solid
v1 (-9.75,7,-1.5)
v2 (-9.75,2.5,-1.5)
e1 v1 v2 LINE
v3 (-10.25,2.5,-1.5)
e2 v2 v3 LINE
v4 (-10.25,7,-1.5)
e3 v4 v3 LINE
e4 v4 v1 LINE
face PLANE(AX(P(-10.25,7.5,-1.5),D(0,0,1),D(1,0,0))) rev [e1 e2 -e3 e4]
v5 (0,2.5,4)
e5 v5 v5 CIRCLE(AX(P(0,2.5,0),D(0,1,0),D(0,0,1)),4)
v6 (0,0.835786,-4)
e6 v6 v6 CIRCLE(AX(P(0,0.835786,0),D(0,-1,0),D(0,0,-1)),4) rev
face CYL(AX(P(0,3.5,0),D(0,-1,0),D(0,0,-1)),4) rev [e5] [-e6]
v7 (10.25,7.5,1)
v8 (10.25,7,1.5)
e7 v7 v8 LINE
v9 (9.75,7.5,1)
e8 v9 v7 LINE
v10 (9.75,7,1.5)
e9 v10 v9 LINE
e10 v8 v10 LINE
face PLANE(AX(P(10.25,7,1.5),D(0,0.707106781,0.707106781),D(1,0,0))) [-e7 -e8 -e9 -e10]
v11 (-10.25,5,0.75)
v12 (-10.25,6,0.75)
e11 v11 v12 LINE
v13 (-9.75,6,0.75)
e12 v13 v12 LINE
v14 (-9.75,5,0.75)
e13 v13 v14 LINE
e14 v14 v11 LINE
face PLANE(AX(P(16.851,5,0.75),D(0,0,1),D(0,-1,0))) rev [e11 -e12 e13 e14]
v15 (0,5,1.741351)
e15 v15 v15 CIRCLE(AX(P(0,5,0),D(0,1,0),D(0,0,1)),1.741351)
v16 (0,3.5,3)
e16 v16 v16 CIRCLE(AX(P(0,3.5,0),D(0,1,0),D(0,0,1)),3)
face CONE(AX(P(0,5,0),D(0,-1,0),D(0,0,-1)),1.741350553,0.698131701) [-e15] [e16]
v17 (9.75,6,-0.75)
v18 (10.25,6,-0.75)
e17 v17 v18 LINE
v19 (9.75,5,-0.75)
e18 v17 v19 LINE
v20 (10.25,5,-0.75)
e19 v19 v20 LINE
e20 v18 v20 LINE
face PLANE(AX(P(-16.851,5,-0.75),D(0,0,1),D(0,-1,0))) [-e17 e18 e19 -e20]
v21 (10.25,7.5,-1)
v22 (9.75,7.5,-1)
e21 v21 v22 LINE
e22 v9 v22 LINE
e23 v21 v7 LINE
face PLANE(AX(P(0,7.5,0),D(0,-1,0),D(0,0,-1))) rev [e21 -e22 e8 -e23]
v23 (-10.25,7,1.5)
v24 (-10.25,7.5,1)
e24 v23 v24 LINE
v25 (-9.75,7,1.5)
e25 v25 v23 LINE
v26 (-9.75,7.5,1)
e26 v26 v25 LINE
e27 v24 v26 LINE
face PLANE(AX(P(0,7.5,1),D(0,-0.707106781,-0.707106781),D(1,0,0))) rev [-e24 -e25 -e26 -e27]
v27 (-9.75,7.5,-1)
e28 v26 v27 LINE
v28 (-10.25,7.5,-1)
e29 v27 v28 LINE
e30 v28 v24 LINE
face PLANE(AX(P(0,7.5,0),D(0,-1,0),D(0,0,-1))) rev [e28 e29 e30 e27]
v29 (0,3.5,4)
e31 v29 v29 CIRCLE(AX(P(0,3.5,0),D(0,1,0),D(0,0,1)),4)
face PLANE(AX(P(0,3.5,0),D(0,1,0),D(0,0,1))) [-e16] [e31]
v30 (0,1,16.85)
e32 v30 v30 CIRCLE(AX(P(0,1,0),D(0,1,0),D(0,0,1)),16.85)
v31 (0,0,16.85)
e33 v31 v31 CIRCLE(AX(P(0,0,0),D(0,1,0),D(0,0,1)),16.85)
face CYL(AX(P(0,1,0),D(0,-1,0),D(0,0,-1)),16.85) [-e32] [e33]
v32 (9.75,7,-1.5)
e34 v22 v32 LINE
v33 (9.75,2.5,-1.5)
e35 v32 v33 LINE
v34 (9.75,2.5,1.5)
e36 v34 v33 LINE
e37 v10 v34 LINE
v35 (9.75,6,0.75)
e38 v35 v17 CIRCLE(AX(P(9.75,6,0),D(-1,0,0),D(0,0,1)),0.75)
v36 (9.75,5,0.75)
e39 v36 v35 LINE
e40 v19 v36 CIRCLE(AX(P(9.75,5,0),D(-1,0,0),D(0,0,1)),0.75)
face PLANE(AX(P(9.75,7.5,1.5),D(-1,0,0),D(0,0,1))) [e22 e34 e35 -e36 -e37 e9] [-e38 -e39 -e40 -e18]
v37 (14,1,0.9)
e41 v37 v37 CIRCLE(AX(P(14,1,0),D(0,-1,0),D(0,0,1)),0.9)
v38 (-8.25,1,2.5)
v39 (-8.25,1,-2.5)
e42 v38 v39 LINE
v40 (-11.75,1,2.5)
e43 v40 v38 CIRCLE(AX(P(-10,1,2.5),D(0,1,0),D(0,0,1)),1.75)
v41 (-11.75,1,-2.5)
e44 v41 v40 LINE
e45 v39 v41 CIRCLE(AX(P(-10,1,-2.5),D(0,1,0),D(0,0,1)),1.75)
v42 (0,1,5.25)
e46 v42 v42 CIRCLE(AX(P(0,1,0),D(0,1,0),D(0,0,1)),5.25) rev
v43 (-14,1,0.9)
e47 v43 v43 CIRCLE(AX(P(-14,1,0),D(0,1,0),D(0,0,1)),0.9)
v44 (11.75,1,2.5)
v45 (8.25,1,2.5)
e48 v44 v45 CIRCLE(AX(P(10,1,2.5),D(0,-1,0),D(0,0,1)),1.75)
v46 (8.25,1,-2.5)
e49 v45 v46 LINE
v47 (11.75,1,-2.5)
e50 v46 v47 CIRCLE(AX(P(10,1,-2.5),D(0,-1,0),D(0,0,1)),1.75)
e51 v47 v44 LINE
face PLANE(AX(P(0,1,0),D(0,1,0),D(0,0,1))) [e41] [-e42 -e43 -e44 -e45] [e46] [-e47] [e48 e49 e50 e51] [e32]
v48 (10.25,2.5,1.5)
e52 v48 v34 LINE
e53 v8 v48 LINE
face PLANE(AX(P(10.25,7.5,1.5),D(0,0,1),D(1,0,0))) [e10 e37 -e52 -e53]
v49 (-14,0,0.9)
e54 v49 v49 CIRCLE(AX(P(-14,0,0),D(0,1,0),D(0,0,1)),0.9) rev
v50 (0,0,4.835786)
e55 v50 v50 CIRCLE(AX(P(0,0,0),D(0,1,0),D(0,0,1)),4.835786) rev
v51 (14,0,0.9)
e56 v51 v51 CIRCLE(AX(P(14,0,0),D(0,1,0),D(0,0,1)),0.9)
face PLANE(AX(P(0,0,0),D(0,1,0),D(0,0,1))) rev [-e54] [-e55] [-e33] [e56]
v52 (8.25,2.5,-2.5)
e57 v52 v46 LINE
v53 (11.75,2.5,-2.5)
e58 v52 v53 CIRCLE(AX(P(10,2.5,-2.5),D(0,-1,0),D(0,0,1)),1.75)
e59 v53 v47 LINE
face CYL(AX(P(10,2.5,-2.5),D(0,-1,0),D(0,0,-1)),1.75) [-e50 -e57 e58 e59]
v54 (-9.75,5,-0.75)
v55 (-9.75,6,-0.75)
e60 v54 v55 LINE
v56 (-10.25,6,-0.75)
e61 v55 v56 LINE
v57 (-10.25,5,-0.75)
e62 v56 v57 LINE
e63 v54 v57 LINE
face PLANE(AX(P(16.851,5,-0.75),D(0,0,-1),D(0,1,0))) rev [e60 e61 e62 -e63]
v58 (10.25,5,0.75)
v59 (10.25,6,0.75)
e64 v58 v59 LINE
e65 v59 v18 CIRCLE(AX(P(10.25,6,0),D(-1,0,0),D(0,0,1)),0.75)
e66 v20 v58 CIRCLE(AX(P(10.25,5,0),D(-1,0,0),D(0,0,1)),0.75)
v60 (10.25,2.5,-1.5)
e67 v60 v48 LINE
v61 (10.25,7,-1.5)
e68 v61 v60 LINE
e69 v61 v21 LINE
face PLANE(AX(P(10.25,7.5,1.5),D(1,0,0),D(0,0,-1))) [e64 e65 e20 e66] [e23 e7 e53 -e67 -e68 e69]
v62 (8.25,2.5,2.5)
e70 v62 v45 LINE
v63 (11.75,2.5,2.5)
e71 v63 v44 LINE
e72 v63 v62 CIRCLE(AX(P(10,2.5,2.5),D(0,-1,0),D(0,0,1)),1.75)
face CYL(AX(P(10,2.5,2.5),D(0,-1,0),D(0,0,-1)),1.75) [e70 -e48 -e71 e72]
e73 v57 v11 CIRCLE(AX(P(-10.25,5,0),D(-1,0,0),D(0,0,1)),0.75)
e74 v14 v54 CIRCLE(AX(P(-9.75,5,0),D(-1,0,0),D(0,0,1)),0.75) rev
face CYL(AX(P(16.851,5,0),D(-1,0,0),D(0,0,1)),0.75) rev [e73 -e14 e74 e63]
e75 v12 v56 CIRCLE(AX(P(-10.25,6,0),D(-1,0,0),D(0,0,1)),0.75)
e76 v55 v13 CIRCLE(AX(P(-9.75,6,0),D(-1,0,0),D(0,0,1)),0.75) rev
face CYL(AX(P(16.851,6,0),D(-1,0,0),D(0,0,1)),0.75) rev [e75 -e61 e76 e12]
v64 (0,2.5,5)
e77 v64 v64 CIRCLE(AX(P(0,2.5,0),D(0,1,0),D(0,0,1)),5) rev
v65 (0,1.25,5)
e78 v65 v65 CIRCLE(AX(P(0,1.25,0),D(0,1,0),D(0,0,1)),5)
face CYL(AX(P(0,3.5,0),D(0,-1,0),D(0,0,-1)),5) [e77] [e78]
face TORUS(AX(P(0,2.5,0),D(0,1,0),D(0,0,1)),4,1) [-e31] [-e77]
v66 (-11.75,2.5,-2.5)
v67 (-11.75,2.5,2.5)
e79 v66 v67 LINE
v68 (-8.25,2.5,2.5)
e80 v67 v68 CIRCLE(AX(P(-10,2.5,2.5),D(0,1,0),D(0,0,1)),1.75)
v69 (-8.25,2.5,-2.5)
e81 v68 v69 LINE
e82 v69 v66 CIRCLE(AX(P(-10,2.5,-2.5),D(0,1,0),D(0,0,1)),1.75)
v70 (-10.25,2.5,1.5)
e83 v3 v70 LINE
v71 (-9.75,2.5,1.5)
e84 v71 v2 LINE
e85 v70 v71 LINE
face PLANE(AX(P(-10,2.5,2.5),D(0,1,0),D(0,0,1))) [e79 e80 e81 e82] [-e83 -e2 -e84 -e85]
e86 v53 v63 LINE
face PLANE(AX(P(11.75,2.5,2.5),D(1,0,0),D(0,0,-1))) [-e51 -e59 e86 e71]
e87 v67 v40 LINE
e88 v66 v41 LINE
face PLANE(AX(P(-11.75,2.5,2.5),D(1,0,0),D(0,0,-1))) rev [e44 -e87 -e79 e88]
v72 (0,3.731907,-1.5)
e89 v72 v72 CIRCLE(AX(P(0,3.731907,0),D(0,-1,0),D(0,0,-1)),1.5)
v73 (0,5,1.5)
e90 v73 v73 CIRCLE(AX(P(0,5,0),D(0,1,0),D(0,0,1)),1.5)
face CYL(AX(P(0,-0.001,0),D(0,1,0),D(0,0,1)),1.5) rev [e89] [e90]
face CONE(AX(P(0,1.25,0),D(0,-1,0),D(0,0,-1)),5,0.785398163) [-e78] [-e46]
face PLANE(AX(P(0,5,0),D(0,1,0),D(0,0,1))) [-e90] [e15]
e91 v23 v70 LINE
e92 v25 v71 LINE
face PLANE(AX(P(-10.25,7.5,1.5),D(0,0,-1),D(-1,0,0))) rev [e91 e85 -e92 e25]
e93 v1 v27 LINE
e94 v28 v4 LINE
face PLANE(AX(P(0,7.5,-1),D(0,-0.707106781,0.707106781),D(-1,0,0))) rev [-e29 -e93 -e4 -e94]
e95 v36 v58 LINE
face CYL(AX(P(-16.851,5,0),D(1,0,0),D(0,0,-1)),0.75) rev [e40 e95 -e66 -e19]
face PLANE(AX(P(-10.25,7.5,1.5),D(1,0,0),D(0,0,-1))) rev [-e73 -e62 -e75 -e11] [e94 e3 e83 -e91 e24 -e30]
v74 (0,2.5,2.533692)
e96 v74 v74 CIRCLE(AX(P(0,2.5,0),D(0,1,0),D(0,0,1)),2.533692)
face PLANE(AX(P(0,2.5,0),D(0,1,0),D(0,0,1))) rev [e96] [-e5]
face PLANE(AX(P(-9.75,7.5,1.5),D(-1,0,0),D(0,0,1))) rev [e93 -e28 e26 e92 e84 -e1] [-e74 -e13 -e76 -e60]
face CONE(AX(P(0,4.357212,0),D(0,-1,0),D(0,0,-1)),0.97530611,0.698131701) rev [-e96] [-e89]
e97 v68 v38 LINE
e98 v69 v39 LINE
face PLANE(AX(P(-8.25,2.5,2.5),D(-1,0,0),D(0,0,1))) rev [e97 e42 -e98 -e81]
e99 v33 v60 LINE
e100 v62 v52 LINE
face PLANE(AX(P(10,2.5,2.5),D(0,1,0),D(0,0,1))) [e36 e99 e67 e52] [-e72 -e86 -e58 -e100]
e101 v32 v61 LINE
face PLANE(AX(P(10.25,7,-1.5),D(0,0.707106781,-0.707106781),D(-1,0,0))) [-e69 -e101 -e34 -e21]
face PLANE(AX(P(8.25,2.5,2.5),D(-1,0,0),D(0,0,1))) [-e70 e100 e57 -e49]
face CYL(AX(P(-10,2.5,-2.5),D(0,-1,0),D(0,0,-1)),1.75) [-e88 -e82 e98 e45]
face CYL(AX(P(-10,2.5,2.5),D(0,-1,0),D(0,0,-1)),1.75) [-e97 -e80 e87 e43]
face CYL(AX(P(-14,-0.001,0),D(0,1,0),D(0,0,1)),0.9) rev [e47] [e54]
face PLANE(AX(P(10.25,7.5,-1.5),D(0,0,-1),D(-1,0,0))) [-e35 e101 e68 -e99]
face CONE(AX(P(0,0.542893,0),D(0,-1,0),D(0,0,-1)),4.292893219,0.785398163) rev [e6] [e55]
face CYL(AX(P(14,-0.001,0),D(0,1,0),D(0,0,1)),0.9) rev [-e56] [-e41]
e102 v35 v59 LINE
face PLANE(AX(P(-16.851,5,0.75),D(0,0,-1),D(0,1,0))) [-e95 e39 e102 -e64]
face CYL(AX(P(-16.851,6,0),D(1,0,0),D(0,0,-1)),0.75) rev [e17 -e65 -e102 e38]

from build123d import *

# Parameters (mm, degrees)
SKETCH1_R                = 16.85
BOSS_EXTRUDE1_DEPTH      = 1
SKETCH2_R                = 5
BOSS_EXTRUDE2_DEPTH      = 2.5
SKETCH3_R                = 3
BOSS_EXTRUDE3_DEPTH      = 1.5
CHAMFER1_SIZE2           = 1.258649447
CHAMFER1_SIZE            = 1.5
FILLET1_R                = 1
CHAMFER3_SIZE            = 0.25
CUT_EXTRUDE2_REACH       = 26.163
SKETCH5_R                = 0.9
CUT_EXTRUDE1_REACH       = 26.348
SKETCH4_R                = 1.5
BOSS_EXTRUDE4_DEPTH      = 1.5
SKETCH7_W                = 0.5
SKETCH7_H                = 3
BOSS_EXTRUDE5_DEPTH      = 5
CHAMFER4_SIZE            = 0.5
CUT_EXTRUDE3_REACH       = 34.781
CHAMFER4_OF_MIRROR1_SIZE = 0.5


# Read off the part's stored shape, not the designer's step: Shell2
with BuildPart() as part:
    # Sketch1 → Boss-Extrude1 (new body)
    with BuildSketch(Plane(origin=(0, 0, 0), x_dir=(1, 0, 0), z_dir=(0, 1, 0))):
        with Locations(Location((0, 0, 0), (0, 0, 270))):
            Circle(SKETCH1_R)
    extrude(amount=BOSS_EXTRUDE1_DEPTH)

    # Sketch2 → Boss-Extrude2 (add)
    with BuildSketch(Plane(origin=(0, 1, 0), x_dir=(1, 0, 0), z_dir=(0, 1, 0))):
        with Locations(Location((0, 0, 0), (0, 0, 270))):
            Circle(SKETCH2_R)
    extrude(amount=BOSS_EXTRUDE2_DEPTH)

    # Sketch3 → Boss-Extrude3 (add)
    with BuildSketch(Plane(origin=(0, 3.5, 0), x_dir=(1, 0, 0), z_dir=(0, 1, 0))):
        with Locations(Location((0, 0, 0), (0, 0, 270))):
            Circle(SKETCH3_R)
    extrude(amount=BOSS_EXTRUDE3_DEPTH)

    # Chamfer1
    chamfer1_edges = [part.edges().sort_by_distance(p)[0] for p in [
        (0, 5, -3),
    ]]
    chamfer1_side = [part.faces().sort_by_distance(p)[0] for p in [
        (0, 4.974827011, -3),
    ]]
    chamfer(chamfer1_edges, length=CHAMFER1_SIZE - 0.0001, length2=CHAMFER1_SIZE2 - 0.0001, reference=chamfer1_side[0])  # a hair under: the kernel refuses the full size

    # Fillet1
    fillet1_edges = [part.edges().sort_by_distance(p)[0] for p in [
        (0, 3.5, -5),
    ]]
    fillet(fillet1_edges, radius=FILLET1_R)

    # Chamfer3
    chamfer3_edges = [part.edges().sort_by_distance(p)[0] for p in [
        (0, 1, -5),
    ]]
    chamfer(chamfer3_edges, length=CHAMFER3_SIZE)

    # Shell2 outline → Shell2 (revolve, cut)
    with BuildSketch(Plane.XY):
        Polygon((4, 0.835786438), (4, 2.5), (2.533692342, 2.5), (1.275042895, 4), (0, 4), (0, 0), (4.835786438, 0), align=None)
    revolve(axis=Axis((0, 0, 0), (0, 1, 0)), mode=Mode.SUBTRACT)

    # Sketch5 → Cut-Extrude2 (cut, up to next)
    with BuildSketch(Plane(origin=(0, 1, 0), x_dir=(1, 0, 0), z_dir=(0, 1, 0)), mode=Mode.PRIVATE) as cut_extrude2_sk1:
        with Locations(Location((-14, 0, 0), (0, 0, 270))):
            Circle(SKETCH5_R)
    cut_extrude2_tool1 = extrude(cut_extrude2_sk1.sketch, amount=-CUT_EXTRUDE2_REACH, mode=Mode.PRIVATE) & part.part
    cut_extrude2 = cut_extrude2_tool1.solids().sort_by_distance((-14, 1, 0))[0]
    add(cut_extrude2, mode=Mode.SUBTRACT)

    # Sketch4 → Cut-Extrude1 (cut, up to next)
    with BuildSketch(Plane(origin=(0, 5, 0), x_dir=(1, 0, 0), z_dir=(0, 1, 0)), mode=Mode.PRIVATE) as cut_extrude1_sk1:
        with Locations(Location((0, 0, 0), (0, 0, 270))):
            Circle(SKETCH4_R)
    cut_extrude1_tool1 = extrude(cut_extrude1_sk1.sketch, amount=-CUT_EXTRUDE1_REACH, mode=Mode.PRIVATE) & part.part
    add(cut_extrude1_tool1.solids().sort_by_distance((0, 5, 0))[0], mode=Mode.SUBTRACT)

    # Sketch6 → Boss-Extrude4 (add)
    with BuildSketch(Plane(origin=(0, 1, 0), x_dir=(1, 0, 0), z_dir=(0, 1, 0))):
        with BuildLine():
            Line((-11.75, -2.5), (-11.75, 2.5))
            ThreePointArc((-11.75, 2.5), (-10, 4.25), (-8.25, 2.5))
            Line((-8.25, 2.5), (-8.25, -2.5))
            ThreePointArc((-8.25, -2.5), (-10, -4.25), (-11.75, -2.5))
        make_face()
    boss_extrude4 = extrude(amount=BOSS_EXTRUDE4_DEPTH)

    # Sketch7 → Boss-Extrude5 (add)
    with BuildSketch(Plane(origin=(0, 2.5, 0), x_dir=(1, 0, 0), z_dir=(0, 1, 0))):
        with Locations((-10, 0)):
            Rectangle(SKETCH7_W, SKETCH7_H)
    boss_extrude5 = extrude(amount=BOSS_EXTRUDE5_DEPTH)

    # Chamfer4
    chamfer4_edges = [part.edges().sort_by_distance(p)[0] for p in [
        (-10, 7.5, -1.5),
        (-10, 7.5, 1.5),
    ]]
    chamfer(chamfer4_edges, length=CHAMFER4_SIZE)

    # Sketch8 → Cut-Extrude3 (cut, up to next)
    with BuildSketch(Plane.ZY.offset(10.25), mode=Mode.PRIVATE) as cut_extrude3_sk1:
        with BuildLine():
            Line((-0.75, 5), (-0.75, 6))
            ThreePointArc((-0.75, 6), (0, 6.75), (0.75, 6))
            Line((0.75, 6), (0.75, 5))
            ThreePointArc((0.75, 5), (0, 4.25), (-0.75, 5))
        make_face()
    cut_extrude3_tool1 = extrude(cut_extrude3_sk1.sketch, amount=-CUT_EXTRUDE3_REACH, mode=Mode.PRIVATE) & part.part
    cut_extrude3 = cut_extrude3_tool1.solids().sort_by_distance((-10.25, 5.5, 0))[0]
    add(cut_extrude3, mode=Mode.SUBTRACT)

    # Mirror1: Cut-Extrude2, Boss-Extrude4, Boss-Extrude5, Cut-Extrude3 across plane
    add(cut_extrude2.mirror(Plane(origin=(0, 0, 0), x_dir=(0, 0, 1), z_dir=(1, 0, 0))), mode=Mode.SUBTRACT)
    add(boss_extrude4.mirror(Plane(origin=(0, 0, 0), x_dir=(0, 0, 1), z_dir=(1, 0, 0))))
    add(boss_extrude5.mirror(Plane(origin=(0, 0, 0), x_dir=(0, 0, 1), z_dir=(1, 0, 0))))
    add(cut_extrude3.mirror(Plane(origin=(0, 0, 0), x_dir=(0, 0, 1), z_dir=(1, 0, 0))), mode=Mode.SUBTRACT)

    # Chamfer4 of Mirror1
    chamfer4_of_mirror1_edges = [part.edges().sort_by_distance(p)[0] for p in [
        (10, 7.5, -1.5),
        (10, 7.5, 1.5),
    ]]
    chamfer(chamfer4_of_mirror1_edges, length=CHAMFER4_OF_MIRROR1_SIZE)


solid = part.part
